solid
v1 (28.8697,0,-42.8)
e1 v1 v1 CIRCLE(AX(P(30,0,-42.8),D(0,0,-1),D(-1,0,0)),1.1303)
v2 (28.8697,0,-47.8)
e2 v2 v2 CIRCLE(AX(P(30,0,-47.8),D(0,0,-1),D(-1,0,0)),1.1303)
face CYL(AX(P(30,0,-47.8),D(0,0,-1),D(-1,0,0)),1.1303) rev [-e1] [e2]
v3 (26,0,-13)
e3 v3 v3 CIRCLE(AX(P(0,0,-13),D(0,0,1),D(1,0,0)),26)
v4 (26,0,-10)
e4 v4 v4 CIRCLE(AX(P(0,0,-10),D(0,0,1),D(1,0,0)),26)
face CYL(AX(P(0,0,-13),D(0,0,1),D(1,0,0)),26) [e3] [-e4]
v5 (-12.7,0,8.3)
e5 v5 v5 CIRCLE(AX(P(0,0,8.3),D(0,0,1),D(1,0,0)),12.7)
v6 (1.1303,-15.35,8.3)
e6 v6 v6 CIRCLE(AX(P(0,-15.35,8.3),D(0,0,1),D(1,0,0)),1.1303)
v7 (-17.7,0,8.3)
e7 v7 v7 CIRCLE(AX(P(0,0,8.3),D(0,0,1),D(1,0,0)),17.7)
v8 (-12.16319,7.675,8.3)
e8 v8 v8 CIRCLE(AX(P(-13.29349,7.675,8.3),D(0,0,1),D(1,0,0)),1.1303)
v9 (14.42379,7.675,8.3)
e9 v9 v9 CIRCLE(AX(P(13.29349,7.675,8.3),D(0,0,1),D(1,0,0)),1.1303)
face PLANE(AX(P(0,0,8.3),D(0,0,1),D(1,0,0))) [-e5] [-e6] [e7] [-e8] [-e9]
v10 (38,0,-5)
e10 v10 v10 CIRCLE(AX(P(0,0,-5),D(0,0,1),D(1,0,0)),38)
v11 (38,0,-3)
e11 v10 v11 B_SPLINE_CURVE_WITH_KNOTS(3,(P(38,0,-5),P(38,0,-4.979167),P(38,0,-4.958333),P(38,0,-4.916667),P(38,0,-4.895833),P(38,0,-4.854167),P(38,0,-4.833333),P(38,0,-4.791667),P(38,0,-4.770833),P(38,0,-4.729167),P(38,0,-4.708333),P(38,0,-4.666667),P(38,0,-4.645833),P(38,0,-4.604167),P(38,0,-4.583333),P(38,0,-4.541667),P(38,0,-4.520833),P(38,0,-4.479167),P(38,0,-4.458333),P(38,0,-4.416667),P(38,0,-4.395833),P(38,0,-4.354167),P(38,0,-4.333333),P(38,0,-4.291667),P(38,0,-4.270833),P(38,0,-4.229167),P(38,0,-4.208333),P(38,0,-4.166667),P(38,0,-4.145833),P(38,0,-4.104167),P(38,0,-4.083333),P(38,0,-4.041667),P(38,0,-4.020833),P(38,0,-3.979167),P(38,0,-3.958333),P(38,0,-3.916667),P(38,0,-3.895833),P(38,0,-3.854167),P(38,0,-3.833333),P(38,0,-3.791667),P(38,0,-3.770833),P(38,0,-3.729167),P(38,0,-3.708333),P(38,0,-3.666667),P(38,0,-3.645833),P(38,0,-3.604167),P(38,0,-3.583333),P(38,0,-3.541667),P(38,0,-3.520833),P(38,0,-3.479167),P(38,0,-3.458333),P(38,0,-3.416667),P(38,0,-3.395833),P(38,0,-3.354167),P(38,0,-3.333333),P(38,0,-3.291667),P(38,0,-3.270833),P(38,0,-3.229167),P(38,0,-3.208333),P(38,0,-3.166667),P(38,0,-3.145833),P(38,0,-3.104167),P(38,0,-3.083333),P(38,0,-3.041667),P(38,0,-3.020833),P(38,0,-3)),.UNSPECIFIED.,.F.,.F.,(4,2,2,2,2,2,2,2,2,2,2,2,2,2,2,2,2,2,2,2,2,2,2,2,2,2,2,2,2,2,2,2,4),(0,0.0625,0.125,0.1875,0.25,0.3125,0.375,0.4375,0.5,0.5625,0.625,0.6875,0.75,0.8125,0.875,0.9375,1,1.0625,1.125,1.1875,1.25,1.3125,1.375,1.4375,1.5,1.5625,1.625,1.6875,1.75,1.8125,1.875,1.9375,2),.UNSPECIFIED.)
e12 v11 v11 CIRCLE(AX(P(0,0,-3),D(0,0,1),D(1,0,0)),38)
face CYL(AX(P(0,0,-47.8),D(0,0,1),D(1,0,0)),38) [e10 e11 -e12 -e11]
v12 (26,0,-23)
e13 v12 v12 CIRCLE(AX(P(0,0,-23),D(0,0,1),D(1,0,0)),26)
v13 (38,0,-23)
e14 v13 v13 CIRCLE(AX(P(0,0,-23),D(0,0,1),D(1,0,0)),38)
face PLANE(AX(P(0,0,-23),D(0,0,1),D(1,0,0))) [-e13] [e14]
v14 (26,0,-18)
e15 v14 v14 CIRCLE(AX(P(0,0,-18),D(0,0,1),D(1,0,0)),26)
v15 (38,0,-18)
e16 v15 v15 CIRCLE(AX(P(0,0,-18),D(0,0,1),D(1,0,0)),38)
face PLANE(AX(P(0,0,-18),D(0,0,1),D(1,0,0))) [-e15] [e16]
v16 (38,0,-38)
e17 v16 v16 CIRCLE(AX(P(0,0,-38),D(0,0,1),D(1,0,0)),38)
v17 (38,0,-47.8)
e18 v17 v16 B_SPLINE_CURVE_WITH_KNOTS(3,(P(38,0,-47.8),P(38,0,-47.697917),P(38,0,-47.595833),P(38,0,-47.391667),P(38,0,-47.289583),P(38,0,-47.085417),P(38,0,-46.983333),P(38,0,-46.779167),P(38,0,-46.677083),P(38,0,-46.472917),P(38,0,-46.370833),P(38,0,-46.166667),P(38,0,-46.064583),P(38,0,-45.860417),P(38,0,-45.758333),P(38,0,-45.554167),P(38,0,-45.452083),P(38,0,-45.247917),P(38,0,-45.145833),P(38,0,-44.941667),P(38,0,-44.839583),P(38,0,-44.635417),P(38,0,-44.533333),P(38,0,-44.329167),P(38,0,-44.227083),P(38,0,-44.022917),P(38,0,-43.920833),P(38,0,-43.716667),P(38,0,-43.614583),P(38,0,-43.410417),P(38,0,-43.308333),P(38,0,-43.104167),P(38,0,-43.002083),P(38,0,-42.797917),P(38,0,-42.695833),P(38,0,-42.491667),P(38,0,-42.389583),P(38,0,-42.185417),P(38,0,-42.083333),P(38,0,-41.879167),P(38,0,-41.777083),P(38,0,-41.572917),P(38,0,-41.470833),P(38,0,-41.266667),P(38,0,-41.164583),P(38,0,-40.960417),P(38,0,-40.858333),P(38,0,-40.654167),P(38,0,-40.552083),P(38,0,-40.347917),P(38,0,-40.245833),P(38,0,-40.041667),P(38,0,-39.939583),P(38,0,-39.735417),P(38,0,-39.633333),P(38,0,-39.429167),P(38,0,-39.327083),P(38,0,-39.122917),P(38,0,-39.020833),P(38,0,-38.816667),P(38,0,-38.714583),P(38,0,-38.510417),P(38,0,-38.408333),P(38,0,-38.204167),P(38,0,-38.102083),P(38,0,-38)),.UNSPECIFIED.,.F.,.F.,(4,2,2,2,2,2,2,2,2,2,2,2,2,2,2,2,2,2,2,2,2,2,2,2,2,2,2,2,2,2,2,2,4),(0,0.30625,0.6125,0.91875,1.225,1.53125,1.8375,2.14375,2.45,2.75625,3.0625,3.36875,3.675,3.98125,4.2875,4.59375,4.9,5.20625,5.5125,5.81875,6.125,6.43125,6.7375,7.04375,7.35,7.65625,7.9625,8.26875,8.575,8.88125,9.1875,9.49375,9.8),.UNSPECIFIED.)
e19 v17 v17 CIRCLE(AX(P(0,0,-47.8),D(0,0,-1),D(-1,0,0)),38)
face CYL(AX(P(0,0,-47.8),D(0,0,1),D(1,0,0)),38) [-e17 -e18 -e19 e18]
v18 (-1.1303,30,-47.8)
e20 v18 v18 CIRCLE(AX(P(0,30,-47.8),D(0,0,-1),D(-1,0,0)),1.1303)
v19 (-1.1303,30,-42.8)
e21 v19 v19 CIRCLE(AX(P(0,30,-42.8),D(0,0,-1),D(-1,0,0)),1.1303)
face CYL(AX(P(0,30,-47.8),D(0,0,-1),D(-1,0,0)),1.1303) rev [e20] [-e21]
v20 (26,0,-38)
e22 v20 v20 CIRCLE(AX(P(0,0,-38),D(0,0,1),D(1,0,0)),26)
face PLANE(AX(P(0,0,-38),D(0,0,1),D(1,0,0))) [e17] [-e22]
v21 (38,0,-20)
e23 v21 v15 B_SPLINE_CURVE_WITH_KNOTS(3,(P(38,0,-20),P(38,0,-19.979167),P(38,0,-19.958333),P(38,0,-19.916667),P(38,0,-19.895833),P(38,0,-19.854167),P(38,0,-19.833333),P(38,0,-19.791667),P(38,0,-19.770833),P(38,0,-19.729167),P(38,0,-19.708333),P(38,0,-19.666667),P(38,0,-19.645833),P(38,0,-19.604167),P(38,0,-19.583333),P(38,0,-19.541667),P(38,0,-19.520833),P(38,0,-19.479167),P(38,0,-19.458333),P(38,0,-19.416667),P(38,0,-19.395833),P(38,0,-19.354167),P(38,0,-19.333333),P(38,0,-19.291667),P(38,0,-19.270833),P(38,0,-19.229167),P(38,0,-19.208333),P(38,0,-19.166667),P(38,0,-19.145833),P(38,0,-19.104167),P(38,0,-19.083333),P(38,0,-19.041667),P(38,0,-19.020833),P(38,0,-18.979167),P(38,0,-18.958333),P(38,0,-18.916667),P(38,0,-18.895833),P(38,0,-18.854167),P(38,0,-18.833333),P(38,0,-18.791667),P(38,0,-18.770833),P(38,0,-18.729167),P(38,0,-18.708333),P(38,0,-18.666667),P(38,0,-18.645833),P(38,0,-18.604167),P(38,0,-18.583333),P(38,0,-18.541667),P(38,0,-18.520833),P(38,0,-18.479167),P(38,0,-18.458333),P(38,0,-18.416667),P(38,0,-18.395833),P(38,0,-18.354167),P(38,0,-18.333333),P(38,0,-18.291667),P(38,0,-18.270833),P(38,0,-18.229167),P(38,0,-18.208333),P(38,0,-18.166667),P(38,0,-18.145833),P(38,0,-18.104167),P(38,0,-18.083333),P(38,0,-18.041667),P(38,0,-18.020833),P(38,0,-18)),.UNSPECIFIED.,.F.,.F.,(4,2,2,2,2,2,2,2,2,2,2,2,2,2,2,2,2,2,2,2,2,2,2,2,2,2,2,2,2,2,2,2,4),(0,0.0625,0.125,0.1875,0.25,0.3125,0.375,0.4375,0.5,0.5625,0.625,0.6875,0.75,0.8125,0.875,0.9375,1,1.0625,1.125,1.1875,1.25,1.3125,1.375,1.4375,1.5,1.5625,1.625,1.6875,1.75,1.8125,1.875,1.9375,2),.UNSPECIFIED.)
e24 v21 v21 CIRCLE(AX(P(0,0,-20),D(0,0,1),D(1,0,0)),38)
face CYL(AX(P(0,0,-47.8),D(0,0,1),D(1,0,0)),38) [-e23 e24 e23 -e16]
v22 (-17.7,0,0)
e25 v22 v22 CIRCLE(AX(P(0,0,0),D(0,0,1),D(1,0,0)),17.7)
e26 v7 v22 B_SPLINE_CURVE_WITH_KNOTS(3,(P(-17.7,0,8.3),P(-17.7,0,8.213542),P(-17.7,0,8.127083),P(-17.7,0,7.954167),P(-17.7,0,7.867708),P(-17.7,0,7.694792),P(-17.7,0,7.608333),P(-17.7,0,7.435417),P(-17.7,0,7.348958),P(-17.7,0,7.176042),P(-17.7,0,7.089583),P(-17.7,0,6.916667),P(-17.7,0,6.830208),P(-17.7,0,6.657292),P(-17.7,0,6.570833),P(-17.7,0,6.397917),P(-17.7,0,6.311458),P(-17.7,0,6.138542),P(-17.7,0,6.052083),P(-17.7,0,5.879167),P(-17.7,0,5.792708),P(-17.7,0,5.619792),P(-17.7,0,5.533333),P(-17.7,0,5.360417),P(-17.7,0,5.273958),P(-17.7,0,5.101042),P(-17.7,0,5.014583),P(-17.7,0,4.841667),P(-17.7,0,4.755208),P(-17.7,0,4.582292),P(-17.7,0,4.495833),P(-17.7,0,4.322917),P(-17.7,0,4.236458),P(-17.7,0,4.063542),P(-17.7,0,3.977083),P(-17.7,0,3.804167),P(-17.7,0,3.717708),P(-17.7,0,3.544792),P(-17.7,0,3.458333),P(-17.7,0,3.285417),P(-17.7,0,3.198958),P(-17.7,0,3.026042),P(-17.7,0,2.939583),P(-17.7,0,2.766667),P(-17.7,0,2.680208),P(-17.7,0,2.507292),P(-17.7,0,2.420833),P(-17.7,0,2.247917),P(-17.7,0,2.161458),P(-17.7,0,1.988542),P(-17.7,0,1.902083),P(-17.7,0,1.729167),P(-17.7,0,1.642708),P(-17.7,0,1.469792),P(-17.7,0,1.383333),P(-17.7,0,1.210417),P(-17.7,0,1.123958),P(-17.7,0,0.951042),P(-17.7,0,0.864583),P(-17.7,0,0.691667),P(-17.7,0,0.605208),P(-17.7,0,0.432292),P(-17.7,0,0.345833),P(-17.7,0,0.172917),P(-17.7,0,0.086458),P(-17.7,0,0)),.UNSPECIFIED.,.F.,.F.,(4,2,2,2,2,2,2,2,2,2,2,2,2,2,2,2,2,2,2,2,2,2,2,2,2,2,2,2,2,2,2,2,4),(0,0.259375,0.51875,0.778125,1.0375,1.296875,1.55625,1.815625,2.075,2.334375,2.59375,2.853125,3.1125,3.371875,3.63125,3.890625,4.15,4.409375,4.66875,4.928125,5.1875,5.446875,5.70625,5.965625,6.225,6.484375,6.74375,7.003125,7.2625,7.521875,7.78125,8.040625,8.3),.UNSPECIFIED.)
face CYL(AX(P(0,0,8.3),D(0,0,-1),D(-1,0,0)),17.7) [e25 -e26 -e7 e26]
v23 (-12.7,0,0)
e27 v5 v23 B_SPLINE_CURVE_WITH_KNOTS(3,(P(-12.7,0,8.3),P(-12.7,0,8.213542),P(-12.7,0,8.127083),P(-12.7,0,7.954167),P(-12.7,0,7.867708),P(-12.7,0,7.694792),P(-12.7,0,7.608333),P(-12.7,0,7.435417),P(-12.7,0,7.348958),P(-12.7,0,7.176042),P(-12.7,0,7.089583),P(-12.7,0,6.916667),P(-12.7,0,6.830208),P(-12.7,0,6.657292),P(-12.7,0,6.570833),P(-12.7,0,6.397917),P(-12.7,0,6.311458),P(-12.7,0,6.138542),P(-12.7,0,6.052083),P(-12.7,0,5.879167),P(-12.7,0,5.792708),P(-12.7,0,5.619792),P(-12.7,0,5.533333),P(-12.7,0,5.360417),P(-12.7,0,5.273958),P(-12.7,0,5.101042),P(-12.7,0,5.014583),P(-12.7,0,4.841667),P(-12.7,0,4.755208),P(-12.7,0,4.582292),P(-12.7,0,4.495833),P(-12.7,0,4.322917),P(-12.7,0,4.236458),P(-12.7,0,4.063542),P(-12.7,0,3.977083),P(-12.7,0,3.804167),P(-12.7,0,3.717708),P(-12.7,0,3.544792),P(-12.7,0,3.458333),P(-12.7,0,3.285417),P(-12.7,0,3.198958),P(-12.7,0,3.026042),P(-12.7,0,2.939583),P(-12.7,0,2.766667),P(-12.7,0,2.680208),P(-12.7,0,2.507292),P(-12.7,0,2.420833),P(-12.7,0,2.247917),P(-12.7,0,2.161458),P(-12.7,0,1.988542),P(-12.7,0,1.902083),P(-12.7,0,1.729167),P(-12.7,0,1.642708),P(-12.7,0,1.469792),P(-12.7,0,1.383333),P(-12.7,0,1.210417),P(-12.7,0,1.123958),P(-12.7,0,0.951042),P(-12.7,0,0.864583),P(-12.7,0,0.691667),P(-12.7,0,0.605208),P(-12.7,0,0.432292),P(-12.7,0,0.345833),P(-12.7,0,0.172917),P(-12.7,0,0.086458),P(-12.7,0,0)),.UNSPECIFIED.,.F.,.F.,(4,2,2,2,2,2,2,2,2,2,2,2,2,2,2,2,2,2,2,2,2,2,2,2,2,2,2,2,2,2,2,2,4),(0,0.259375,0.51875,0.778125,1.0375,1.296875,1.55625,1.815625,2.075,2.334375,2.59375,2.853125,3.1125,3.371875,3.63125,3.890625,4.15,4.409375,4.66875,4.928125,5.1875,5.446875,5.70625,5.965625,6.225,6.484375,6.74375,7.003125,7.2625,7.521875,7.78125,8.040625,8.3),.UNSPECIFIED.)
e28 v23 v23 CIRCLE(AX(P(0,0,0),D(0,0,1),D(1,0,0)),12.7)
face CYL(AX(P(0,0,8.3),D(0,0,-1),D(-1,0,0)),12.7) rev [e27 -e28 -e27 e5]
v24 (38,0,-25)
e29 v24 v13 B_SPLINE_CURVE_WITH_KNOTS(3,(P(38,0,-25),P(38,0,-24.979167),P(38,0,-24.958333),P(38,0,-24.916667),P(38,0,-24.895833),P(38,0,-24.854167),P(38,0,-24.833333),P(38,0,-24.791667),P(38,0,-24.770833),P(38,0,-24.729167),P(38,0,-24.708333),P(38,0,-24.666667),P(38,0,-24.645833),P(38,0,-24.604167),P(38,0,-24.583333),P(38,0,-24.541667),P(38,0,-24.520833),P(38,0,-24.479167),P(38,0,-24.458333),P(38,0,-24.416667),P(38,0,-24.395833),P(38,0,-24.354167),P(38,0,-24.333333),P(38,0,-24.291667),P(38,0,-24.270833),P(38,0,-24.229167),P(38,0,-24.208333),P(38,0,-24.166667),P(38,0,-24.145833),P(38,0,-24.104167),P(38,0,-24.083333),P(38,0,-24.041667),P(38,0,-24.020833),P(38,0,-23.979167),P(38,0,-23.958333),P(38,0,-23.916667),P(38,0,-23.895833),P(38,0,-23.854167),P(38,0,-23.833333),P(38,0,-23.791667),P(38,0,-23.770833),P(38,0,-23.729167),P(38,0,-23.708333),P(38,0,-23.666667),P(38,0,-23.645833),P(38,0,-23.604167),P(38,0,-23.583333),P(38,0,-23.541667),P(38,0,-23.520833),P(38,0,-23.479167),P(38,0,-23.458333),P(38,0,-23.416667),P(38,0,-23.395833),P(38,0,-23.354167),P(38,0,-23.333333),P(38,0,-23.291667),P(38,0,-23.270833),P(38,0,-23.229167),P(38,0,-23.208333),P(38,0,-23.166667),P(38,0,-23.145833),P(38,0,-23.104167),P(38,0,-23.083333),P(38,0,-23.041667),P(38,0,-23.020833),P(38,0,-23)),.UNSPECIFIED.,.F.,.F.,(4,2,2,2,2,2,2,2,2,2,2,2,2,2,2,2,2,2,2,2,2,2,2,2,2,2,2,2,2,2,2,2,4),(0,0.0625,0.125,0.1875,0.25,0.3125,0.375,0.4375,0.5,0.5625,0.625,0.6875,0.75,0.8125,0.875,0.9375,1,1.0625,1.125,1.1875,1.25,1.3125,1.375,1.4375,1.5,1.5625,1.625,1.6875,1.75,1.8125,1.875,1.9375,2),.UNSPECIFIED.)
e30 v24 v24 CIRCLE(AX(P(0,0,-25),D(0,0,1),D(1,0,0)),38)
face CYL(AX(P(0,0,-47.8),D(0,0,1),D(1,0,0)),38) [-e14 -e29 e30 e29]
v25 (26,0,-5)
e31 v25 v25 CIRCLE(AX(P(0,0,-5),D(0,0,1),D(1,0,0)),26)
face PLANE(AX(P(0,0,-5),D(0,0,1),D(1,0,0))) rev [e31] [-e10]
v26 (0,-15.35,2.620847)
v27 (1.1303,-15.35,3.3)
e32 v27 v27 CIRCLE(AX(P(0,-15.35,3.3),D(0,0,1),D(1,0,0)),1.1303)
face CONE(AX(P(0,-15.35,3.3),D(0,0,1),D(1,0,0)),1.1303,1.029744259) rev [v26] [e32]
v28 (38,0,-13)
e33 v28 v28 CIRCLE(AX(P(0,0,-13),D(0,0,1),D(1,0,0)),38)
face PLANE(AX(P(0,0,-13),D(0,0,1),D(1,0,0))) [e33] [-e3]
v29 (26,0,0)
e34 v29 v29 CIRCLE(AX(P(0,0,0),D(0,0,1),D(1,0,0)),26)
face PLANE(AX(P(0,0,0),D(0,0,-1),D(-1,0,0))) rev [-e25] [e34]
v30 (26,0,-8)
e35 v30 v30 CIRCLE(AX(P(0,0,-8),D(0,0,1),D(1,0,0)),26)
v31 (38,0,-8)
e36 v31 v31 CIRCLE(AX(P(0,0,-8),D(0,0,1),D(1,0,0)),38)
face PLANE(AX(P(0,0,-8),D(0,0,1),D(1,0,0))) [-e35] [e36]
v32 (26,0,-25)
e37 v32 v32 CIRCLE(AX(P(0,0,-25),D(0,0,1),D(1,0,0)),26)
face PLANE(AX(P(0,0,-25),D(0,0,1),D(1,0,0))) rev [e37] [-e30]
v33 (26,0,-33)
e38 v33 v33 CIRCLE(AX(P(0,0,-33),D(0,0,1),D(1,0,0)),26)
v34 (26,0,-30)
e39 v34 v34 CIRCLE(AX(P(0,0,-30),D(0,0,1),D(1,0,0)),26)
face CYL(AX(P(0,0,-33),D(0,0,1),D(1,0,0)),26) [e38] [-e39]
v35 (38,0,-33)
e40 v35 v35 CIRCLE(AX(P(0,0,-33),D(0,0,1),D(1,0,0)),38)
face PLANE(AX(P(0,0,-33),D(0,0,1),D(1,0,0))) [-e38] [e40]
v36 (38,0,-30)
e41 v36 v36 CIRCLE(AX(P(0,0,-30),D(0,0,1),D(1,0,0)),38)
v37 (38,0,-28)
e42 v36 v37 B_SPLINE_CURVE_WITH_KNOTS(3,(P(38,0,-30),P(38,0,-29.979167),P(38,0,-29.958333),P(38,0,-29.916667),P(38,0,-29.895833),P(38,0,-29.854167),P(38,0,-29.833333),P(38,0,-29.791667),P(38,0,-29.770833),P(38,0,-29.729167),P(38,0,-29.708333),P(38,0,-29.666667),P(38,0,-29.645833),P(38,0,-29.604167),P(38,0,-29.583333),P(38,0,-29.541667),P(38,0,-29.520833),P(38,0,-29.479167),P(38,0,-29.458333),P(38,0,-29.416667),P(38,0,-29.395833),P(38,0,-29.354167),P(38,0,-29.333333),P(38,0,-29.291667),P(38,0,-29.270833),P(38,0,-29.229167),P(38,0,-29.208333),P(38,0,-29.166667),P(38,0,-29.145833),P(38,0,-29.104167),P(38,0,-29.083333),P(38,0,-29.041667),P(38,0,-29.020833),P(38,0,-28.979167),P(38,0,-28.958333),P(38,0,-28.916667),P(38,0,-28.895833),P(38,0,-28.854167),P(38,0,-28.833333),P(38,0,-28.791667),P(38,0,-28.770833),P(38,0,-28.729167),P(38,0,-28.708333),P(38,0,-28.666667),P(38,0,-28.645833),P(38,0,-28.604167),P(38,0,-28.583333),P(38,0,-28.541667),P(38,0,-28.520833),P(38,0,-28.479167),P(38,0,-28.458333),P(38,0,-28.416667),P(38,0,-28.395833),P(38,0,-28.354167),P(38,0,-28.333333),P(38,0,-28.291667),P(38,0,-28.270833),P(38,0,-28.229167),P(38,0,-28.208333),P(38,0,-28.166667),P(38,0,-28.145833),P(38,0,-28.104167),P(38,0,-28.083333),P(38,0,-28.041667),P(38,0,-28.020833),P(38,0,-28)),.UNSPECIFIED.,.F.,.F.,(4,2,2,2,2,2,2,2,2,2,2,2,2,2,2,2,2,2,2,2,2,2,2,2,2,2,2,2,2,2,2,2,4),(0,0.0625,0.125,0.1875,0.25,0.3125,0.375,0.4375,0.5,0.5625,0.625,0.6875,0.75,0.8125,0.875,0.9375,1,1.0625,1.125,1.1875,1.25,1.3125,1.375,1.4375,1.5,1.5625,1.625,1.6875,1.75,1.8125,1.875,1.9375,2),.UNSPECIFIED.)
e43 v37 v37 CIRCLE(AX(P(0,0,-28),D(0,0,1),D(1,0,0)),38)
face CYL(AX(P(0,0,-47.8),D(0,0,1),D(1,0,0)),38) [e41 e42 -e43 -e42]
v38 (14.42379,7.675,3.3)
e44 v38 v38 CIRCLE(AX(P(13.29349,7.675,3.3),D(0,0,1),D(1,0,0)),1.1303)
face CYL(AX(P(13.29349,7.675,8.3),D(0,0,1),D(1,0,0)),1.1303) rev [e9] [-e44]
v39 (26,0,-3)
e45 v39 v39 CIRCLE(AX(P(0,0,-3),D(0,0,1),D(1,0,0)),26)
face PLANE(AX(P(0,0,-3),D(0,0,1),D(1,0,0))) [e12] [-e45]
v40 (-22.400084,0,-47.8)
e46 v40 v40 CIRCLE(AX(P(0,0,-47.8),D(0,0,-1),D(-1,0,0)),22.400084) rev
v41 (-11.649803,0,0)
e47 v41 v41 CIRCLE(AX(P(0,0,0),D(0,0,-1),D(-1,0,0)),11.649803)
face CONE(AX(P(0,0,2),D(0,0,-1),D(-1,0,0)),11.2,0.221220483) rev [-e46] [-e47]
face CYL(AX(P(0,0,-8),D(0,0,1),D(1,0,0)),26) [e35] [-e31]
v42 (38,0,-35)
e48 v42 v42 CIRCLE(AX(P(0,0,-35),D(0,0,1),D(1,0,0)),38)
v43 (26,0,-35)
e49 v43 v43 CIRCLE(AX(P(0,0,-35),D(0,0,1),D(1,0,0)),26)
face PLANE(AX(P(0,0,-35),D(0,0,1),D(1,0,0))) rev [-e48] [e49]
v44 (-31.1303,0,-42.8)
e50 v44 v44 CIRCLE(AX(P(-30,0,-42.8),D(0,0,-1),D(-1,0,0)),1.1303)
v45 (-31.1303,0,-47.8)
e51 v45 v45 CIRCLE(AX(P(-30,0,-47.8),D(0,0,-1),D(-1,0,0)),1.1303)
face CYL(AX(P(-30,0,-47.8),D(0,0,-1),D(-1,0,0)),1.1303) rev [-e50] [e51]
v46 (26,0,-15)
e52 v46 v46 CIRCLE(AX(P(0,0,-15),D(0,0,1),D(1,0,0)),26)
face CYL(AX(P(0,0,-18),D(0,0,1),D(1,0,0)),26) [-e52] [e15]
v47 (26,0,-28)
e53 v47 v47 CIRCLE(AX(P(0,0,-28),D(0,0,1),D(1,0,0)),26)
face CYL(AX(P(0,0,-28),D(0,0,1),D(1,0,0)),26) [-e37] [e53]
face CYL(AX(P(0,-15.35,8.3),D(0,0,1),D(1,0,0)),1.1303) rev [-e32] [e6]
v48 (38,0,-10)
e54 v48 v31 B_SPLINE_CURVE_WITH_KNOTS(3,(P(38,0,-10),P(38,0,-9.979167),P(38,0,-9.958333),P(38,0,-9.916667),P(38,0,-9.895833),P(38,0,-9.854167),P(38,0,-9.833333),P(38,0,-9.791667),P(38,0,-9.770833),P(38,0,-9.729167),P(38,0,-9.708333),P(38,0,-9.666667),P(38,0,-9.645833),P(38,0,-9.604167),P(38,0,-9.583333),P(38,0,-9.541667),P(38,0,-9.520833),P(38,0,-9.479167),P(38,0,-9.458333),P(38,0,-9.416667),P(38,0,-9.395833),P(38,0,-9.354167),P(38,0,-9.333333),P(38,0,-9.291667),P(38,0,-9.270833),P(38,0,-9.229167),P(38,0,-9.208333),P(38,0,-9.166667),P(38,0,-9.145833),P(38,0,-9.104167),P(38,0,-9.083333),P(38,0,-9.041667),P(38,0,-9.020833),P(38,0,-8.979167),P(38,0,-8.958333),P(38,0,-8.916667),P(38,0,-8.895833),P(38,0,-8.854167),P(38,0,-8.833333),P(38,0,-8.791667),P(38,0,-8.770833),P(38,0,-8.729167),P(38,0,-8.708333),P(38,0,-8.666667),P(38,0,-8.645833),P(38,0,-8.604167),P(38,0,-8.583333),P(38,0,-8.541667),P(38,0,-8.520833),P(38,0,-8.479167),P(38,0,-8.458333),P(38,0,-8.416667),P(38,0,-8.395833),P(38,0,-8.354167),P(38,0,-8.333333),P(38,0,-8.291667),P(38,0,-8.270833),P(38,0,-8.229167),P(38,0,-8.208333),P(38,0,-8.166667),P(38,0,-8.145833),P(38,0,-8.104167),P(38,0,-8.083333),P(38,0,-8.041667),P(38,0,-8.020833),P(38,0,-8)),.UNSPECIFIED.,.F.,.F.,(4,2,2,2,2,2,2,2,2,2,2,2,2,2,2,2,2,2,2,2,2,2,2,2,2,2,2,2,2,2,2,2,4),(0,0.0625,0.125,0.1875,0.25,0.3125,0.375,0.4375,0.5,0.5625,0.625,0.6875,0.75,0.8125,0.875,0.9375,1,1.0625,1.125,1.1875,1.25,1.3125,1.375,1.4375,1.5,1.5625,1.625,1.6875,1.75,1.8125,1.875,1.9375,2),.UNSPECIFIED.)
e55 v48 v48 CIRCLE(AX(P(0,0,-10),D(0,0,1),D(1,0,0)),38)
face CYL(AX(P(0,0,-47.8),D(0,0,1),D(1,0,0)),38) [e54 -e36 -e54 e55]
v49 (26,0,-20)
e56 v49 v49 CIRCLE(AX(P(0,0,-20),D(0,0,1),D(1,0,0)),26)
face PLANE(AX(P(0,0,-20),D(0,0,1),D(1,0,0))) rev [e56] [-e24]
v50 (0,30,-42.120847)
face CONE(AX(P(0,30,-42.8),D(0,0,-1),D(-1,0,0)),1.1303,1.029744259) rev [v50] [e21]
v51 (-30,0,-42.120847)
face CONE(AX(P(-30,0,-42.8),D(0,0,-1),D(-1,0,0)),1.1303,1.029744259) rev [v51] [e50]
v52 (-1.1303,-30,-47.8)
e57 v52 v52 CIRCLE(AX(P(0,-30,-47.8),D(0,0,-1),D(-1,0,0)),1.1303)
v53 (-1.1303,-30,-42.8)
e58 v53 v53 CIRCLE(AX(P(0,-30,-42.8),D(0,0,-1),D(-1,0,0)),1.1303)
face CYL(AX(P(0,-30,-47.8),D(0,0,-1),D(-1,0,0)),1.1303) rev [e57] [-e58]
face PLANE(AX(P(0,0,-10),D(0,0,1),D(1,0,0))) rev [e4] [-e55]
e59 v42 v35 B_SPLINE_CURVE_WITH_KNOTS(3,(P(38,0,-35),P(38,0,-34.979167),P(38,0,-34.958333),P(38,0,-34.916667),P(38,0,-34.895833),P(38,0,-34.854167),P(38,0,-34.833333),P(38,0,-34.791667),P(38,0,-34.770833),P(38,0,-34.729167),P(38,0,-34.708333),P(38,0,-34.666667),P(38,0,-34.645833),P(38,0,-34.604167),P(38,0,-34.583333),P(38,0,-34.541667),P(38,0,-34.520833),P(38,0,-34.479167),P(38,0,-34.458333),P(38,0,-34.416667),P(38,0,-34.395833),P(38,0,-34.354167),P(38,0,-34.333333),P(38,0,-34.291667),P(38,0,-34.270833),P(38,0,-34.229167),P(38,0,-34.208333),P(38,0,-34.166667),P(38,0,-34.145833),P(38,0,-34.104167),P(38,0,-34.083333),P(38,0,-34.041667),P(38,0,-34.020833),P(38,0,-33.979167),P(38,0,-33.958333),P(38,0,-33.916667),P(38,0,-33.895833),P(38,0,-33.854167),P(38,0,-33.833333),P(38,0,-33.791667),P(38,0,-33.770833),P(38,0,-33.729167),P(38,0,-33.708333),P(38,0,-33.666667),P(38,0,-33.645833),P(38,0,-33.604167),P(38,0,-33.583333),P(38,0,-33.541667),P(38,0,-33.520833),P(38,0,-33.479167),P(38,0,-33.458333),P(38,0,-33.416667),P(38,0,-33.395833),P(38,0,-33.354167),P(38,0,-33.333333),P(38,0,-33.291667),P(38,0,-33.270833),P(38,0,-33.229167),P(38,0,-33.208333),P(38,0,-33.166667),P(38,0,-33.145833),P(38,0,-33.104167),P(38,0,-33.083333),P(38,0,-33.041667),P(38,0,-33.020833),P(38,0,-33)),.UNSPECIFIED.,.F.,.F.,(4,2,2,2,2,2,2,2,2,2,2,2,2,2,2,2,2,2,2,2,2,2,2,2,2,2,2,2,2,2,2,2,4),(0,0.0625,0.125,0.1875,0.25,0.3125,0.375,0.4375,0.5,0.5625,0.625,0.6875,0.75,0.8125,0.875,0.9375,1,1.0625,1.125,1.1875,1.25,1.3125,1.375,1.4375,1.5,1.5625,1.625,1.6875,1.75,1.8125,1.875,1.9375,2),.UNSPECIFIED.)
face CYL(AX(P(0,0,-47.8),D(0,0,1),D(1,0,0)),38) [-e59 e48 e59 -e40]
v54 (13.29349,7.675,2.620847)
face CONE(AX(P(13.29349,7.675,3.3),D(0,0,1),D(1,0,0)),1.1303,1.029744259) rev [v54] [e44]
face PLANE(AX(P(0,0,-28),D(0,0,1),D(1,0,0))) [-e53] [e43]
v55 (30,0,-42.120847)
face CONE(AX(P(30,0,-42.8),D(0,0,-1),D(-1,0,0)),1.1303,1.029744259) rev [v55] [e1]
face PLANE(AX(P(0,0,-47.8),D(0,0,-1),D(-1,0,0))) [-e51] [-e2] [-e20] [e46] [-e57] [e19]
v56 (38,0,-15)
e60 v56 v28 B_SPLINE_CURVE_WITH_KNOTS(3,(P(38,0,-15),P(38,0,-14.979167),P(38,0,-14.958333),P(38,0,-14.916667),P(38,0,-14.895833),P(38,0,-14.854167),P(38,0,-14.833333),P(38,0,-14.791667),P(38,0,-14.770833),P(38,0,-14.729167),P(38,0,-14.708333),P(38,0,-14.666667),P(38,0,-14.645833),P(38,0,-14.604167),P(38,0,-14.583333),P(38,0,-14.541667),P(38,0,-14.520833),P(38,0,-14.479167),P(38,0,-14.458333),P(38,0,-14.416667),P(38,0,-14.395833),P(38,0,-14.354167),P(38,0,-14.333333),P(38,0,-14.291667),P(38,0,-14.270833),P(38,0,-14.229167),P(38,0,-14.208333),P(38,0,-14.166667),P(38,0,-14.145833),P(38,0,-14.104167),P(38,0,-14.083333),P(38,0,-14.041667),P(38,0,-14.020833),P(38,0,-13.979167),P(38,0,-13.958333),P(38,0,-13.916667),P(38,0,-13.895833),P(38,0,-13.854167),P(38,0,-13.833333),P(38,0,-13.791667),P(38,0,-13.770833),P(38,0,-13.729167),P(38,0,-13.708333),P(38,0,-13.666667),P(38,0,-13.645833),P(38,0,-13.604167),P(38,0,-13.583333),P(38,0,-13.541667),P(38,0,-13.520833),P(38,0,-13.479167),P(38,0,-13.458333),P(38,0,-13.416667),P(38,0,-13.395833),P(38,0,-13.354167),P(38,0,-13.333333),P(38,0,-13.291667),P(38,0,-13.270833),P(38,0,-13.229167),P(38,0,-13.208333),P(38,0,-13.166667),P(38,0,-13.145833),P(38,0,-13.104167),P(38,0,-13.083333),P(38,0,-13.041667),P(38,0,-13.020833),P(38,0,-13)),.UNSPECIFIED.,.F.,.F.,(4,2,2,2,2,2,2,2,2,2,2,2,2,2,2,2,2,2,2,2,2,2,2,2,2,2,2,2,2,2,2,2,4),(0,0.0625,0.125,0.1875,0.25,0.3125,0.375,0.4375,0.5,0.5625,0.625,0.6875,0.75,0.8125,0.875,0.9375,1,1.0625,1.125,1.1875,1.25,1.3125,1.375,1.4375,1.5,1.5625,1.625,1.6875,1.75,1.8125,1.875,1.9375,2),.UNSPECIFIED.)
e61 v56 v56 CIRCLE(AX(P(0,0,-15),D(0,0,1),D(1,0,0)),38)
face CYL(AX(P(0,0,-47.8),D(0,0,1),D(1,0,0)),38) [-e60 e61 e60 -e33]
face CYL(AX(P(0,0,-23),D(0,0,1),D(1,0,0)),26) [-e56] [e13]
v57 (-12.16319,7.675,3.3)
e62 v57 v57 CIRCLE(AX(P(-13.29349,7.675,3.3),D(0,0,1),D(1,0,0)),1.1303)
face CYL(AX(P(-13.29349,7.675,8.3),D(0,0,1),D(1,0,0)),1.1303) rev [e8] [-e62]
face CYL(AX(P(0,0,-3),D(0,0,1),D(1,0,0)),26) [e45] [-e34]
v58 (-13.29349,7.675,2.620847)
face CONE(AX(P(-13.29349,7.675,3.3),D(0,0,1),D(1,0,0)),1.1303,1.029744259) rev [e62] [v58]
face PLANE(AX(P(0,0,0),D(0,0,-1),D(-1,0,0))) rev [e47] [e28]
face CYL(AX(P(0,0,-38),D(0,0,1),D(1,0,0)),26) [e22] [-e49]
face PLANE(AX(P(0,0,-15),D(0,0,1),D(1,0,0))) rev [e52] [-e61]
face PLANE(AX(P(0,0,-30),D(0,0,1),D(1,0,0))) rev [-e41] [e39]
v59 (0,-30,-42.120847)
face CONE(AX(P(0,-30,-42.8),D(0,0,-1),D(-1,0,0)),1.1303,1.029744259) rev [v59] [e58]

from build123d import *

# Parameters (mm, degrees)
ESQUISSE1_R        = 17.7
ESQUISSE1_R_2      = 12.7
BOSS_EXTRU_1_DEPTH = 8.3
ESQUISSE2_R        = 38
ESQUISSE2_R_2      = 11.2
BOSS_EXTRU_2_DEPTH = 47.8
CHANFREIN3_SIZE    = 11.200084029
CHANFREIN3_SIZE_2  = 49.8
SKETCH7_R          = 38
SKETCH7_R_2        = 26
CUT_EXTRUDE2_DEPTH = 3
CIRPATTERN1_COUNT  = 4
CIRPATTERN2_COUNT  = 3
LPATTERN1_COUNT    = 8
LPATTERN1_PITCH    = 5


with BuildPart() as part:
    # Esquisse1 → Boss.-Extru.1 (new body)
    with BuildSketch(Plane.XY):
        with Locations(Location((0, 0, 0), (0, 0, 180))):
            Circle(ESQUISSE1_R)
        with Locations(Location((0, 0, 0), (0, 0, 180))):
            Circle(ESQUISSE1_R_2, mode=Mode.SUBTRACT)
    extrude(amount=BOSS_EXTRU_1_DEPTH)

    # Esquisse2 → Boss.-Extru.2 (add)
    with BuildSketch(Plane(origin=(0, 0, 0), x_dir=(-1, 0, 0), z_dir=(0, 0, -1))):
        with Locations(Location((0, 0, 0), (0, 0, 180))):
            Circle(ESQUISSE2_R)
        with Locations(Location((0, 0, 0), (0, 0, 180))):
            Circle(ESQUISSE2_R_2, mode=Mode.SUBTRACT)
    extrude(amount=BOSS_EXTRU_2_DEPTH)

    # Chanfrein3
    # the kernel refuses this chamfer: 49.8, 11.200084029 mm, written as the material it takes off along each edge
    with BuildSketch(Plane(origin=(0, 0, -47.8), x_dir=(1, 0, 0), z_dir=(0, 1, 0))) as chanfrein3_piece_1:
        Polygon((11.2 + CHANFREIN3_SIZE, 0), (11.2, -CHANFREIN3_SIZE_2), (11.2, 0), align=None)
    revolve(axis=Axis((0, 0, -47.8), (0, 0, -1)), mode=Mode.SUBTRACT)

    # Sketch7 → Cut-Extrude2 (cut)
    with BuildSketch(Plane.XY):
        Circle(SKETCH7_R)
        Circle(SKETCH7_R_2, mode=Mode.SUBTRACT)
    cut_extrude2 = extrude(amount=-CUT_EXTRUDE2_DEPTH, mode=Mode.SUBTRACT)

    # Sketch19 → #4-40 Tapped Hole1 (revolve, cut)
    with BuildSketch(Plane(origin=(0, -30, -47.8), x_dir=(0, 1, 0), z_dir=(1, 0, 0))):
        Polygon((0, 0), (0, 5.679152758), (1.1303, 5), (1.1303, 0), align=None)
    f_4_40_tapped_hole1 = revolve(axis=Axis((0, -30, -54.15), (0, 0, 1)), mode=Mode.SUBTRACT)

    # CirPattern1: #4-40 Tapped Hole1 ×4 about axis
    cirpattern1_axis = Axis((0, 0, 0), (0, 0, 1))
    for i in range(1, CIRPATTERN1_COUNT):
        add(f_4_40_tapped_hole1.rotate(cirpattern1_axis, i * 360 / CIRPATTERN1_COUNT), mode=Mode.SUBTRACT)

    # Sketch22 → #4-40 Tapped Hole2 (revolve, cut)
    with BuildSketch(Plane(origin=(0, -15.35, 8.3), x_dir=(0, -1, 0), z_dir=(1, 0, 0))):
        Polygon((0, 0), (0, 5.679152758), (1.1303, 5), (1.1303, 0), align=None)
    f_4_40_tapped_hole2 = revolve(axis=Axis((0, -15.35, 14.65), (0, 0, -1)), mode=Mode.SUBTRACT)

    # CirPattern2: #4-40 Tapped Hole2 ×3 about axis
    cirpattern2_axis = Axis((0, 0, 0), (0, 0, 1))
    for i in range(1, CIRPATTERN2_COUNT):
        add(f_4_40_tapped_hole2.rotate(cirpattern2_axis, i * 360 / CIRPATTERN2_COUNT), mode=Mode.SUBTRACT)

    # LPattern1: Cut-Extrude2 ×8
    with Locations(*[(0, 0, -i * LPATTERN1_PITCH) for i in range(1, LPATTERN1_COUNT)]):
        add(cut_extrude2, mode=Mode.SUBTRACT)


solid = part.part
